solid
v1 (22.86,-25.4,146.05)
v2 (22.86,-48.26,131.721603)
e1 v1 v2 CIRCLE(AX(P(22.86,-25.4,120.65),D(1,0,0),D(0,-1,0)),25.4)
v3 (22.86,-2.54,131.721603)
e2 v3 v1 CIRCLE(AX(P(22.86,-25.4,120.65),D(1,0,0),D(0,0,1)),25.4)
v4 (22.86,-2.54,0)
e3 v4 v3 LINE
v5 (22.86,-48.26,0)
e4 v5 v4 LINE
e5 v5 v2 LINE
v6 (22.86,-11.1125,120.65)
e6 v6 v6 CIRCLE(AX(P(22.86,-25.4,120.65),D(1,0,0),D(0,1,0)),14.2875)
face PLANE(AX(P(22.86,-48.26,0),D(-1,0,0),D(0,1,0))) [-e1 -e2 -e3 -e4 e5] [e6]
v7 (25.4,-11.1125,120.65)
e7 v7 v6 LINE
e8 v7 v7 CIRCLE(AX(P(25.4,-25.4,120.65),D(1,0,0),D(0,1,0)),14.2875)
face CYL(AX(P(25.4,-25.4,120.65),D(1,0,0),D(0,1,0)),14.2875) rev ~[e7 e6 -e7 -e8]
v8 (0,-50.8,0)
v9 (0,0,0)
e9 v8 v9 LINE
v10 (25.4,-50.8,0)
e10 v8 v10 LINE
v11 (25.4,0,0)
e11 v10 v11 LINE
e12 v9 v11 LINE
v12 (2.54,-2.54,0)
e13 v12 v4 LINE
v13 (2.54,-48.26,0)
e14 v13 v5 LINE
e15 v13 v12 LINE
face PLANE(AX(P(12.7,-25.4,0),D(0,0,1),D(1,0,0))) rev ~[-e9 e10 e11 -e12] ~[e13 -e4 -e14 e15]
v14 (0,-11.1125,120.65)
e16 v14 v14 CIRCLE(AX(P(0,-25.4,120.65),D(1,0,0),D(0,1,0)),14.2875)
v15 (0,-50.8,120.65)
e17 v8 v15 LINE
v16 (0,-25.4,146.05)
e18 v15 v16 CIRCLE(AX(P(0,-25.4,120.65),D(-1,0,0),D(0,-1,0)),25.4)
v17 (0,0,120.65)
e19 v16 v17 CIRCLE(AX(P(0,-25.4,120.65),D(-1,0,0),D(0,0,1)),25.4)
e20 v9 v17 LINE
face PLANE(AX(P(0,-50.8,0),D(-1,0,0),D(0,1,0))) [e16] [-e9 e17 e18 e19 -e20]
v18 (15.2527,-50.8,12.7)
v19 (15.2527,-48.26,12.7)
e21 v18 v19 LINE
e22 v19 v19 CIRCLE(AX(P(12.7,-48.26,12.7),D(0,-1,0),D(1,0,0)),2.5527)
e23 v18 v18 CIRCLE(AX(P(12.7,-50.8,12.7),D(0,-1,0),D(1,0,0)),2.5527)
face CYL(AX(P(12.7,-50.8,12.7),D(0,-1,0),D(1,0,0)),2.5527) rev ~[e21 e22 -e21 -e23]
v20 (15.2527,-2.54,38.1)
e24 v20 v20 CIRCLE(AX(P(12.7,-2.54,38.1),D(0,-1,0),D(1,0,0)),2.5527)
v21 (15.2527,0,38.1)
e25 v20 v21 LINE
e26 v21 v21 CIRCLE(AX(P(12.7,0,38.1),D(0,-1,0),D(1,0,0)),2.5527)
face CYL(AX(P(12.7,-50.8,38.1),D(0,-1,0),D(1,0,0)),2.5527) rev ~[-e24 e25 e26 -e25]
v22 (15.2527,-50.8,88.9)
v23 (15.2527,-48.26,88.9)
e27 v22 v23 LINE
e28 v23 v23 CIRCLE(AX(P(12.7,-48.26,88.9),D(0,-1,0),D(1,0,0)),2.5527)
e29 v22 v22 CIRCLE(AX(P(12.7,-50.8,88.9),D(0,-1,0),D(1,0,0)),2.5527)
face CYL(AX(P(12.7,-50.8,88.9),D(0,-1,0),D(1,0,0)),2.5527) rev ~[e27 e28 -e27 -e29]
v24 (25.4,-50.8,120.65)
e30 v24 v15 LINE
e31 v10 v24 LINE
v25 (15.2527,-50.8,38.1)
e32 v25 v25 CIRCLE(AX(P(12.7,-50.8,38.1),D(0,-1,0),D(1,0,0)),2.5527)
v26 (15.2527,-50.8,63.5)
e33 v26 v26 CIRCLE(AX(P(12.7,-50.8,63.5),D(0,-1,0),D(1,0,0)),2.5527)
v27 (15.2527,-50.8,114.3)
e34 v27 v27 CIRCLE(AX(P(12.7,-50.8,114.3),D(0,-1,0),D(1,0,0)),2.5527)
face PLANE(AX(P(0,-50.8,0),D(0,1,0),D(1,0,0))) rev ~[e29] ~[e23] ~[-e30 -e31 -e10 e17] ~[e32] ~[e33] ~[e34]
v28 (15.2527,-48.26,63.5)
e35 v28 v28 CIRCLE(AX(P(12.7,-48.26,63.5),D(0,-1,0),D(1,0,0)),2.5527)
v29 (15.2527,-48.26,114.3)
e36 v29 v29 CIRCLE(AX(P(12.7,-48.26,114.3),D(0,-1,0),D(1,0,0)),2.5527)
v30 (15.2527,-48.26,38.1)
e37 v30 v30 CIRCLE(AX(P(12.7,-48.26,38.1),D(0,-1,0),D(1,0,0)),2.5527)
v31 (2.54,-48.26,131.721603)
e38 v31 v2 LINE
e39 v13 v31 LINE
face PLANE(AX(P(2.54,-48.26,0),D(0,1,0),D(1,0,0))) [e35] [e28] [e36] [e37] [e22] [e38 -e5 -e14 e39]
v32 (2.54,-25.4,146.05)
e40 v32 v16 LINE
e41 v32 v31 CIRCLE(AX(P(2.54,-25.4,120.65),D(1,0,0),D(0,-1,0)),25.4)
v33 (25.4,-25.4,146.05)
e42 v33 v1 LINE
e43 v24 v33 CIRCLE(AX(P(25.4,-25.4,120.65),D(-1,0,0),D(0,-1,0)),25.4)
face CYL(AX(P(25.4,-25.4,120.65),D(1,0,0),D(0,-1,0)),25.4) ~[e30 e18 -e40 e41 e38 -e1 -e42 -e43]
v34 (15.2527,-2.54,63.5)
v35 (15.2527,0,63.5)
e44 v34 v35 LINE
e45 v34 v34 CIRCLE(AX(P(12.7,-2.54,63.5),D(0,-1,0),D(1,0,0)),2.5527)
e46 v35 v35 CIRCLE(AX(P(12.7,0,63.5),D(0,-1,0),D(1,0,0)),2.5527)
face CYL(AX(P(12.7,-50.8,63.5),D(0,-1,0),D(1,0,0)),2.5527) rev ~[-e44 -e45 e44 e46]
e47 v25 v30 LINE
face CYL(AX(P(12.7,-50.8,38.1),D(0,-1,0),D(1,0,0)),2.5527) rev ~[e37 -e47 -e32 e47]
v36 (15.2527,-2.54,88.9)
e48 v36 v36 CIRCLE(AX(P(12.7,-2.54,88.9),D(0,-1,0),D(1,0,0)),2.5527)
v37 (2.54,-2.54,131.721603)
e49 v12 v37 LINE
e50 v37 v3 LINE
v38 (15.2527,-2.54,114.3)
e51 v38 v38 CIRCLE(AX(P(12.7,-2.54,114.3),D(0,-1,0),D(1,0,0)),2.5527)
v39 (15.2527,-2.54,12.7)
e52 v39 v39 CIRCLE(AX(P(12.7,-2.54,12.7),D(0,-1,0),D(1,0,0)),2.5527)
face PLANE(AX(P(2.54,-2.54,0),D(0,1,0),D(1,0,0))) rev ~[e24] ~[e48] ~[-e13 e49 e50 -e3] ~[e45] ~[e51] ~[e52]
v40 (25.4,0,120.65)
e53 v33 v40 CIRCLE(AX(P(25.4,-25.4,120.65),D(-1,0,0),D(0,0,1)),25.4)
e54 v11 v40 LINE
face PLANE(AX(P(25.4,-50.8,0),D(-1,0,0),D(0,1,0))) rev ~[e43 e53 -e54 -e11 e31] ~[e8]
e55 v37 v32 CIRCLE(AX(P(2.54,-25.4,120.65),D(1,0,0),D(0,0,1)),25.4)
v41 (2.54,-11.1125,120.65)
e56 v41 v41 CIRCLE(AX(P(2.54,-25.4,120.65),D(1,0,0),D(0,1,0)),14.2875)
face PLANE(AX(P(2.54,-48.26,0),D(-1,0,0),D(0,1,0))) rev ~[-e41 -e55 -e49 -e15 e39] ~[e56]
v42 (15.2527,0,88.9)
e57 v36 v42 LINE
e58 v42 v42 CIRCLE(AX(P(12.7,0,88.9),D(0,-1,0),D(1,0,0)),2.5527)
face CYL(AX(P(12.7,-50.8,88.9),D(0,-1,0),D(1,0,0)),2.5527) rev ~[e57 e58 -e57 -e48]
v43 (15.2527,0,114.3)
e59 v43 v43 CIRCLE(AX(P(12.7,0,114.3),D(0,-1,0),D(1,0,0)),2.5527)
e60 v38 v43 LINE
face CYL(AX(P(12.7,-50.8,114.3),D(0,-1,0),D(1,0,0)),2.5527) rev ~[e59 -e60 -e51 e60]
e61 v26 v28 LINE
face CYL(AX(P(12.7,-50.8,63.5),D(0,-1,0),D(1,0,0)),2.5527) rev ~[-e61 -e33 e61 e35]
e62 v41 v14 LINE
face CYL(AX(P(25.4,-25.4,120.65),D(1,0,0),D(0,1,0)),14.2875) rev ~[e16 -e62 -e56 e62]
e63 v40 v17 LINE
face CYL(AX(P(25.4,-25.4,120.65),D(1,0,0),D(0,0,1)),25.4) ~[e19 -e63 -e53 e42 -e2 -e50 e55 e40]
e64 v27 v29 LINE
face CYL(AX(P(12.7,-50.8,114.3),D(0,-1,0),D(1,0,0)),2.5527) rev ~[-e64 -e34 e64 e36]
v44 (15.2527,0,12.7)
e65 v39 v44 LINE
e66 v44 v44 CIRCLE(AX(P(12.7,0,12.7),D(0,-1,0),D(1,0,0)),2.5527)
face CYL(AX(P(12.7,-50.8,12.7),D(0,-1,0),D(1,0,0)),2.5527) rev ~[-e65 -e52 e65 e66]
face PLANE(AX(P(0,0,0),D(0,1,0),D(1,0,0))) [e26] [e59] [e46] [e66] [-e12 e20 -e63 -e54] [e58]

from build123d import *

# Parameters (mm, degrees)
F0_W     = 25.4
F0_H     = 50.8
F0_W_2   = 20.32
F0_H_2   = 45.72
F1_DEPTH = 146.05
F2_R     = 2.5527
F3_DEPTH = 76.2
F4_R     = 14.2875
F5_DEPTH = 25.4


# Not quite as in the source:
# - a feature names something its author has since deleted; it is built from what else it names


with BuildPart() as f1:
    # F0 (on Top) → F1 (new body)
    with BuildSketch(Plane.XY):
        with Locations((12.7, -25.4)):
            Rectangle(F0_W, F0_H)
        with Locations((12.7, -25.4)):
            Rectangle(F0_W_2, F0_H_2, mode=Mode.SUBTRACT)
    extrude(amount=F1_DEPTH)

    # F2 (on face) → F3 (cut)
    with BuildSketch(Plane.XZ.offset(50.8)):
        with Locations((12.7, 88.9)):
            Circle(F2_R)
        with Locations((12.7, 63.5)):
            Circle(F2_R)
        with Locations((12.7, 38.1)):
            Circle(F2_R)
        with Locations((12.7, 12.7)):
            Circle(F2_R)
        with Locations((12.7, 114.3)):
            Circle(F2_R)
        with Locations((12.7, 139.7)):
            Circle(F2_R)
    extrude(amount=-F3_DEPTH, mode=Mode.SUBTRACT)

    # F4 (on face) → F5 (cut)
    with BuildSketch(Plane.YZ.offset(25.4)):
        with Locations((-25.4, 120.65)):
            Circle(F4_R)
        with BuildLine():
            ThreePointArc((-50.8, 120.65), (-43.3605122421, 138.6105122421), (-25.4, 146.05))
            Line((-25.4, 146.05), (-50.8, 146.05))
            Line((-50.8, 146.05), (-50.8, 120.65))
        make_face()
        with BuildLine():
            ThreePointArc((-25.4, 146.05), (-7.4394877579, 138.6105122421), (0, 120.65))
            Line((0, 120.65), (0, 146.05))
            Line((0, 146.05), (-25.4, 146.05))
        make_face()
    extrude(amount=-F5_DEPTH, mode=Mode.SUBTRACT)


solid = f1.part
